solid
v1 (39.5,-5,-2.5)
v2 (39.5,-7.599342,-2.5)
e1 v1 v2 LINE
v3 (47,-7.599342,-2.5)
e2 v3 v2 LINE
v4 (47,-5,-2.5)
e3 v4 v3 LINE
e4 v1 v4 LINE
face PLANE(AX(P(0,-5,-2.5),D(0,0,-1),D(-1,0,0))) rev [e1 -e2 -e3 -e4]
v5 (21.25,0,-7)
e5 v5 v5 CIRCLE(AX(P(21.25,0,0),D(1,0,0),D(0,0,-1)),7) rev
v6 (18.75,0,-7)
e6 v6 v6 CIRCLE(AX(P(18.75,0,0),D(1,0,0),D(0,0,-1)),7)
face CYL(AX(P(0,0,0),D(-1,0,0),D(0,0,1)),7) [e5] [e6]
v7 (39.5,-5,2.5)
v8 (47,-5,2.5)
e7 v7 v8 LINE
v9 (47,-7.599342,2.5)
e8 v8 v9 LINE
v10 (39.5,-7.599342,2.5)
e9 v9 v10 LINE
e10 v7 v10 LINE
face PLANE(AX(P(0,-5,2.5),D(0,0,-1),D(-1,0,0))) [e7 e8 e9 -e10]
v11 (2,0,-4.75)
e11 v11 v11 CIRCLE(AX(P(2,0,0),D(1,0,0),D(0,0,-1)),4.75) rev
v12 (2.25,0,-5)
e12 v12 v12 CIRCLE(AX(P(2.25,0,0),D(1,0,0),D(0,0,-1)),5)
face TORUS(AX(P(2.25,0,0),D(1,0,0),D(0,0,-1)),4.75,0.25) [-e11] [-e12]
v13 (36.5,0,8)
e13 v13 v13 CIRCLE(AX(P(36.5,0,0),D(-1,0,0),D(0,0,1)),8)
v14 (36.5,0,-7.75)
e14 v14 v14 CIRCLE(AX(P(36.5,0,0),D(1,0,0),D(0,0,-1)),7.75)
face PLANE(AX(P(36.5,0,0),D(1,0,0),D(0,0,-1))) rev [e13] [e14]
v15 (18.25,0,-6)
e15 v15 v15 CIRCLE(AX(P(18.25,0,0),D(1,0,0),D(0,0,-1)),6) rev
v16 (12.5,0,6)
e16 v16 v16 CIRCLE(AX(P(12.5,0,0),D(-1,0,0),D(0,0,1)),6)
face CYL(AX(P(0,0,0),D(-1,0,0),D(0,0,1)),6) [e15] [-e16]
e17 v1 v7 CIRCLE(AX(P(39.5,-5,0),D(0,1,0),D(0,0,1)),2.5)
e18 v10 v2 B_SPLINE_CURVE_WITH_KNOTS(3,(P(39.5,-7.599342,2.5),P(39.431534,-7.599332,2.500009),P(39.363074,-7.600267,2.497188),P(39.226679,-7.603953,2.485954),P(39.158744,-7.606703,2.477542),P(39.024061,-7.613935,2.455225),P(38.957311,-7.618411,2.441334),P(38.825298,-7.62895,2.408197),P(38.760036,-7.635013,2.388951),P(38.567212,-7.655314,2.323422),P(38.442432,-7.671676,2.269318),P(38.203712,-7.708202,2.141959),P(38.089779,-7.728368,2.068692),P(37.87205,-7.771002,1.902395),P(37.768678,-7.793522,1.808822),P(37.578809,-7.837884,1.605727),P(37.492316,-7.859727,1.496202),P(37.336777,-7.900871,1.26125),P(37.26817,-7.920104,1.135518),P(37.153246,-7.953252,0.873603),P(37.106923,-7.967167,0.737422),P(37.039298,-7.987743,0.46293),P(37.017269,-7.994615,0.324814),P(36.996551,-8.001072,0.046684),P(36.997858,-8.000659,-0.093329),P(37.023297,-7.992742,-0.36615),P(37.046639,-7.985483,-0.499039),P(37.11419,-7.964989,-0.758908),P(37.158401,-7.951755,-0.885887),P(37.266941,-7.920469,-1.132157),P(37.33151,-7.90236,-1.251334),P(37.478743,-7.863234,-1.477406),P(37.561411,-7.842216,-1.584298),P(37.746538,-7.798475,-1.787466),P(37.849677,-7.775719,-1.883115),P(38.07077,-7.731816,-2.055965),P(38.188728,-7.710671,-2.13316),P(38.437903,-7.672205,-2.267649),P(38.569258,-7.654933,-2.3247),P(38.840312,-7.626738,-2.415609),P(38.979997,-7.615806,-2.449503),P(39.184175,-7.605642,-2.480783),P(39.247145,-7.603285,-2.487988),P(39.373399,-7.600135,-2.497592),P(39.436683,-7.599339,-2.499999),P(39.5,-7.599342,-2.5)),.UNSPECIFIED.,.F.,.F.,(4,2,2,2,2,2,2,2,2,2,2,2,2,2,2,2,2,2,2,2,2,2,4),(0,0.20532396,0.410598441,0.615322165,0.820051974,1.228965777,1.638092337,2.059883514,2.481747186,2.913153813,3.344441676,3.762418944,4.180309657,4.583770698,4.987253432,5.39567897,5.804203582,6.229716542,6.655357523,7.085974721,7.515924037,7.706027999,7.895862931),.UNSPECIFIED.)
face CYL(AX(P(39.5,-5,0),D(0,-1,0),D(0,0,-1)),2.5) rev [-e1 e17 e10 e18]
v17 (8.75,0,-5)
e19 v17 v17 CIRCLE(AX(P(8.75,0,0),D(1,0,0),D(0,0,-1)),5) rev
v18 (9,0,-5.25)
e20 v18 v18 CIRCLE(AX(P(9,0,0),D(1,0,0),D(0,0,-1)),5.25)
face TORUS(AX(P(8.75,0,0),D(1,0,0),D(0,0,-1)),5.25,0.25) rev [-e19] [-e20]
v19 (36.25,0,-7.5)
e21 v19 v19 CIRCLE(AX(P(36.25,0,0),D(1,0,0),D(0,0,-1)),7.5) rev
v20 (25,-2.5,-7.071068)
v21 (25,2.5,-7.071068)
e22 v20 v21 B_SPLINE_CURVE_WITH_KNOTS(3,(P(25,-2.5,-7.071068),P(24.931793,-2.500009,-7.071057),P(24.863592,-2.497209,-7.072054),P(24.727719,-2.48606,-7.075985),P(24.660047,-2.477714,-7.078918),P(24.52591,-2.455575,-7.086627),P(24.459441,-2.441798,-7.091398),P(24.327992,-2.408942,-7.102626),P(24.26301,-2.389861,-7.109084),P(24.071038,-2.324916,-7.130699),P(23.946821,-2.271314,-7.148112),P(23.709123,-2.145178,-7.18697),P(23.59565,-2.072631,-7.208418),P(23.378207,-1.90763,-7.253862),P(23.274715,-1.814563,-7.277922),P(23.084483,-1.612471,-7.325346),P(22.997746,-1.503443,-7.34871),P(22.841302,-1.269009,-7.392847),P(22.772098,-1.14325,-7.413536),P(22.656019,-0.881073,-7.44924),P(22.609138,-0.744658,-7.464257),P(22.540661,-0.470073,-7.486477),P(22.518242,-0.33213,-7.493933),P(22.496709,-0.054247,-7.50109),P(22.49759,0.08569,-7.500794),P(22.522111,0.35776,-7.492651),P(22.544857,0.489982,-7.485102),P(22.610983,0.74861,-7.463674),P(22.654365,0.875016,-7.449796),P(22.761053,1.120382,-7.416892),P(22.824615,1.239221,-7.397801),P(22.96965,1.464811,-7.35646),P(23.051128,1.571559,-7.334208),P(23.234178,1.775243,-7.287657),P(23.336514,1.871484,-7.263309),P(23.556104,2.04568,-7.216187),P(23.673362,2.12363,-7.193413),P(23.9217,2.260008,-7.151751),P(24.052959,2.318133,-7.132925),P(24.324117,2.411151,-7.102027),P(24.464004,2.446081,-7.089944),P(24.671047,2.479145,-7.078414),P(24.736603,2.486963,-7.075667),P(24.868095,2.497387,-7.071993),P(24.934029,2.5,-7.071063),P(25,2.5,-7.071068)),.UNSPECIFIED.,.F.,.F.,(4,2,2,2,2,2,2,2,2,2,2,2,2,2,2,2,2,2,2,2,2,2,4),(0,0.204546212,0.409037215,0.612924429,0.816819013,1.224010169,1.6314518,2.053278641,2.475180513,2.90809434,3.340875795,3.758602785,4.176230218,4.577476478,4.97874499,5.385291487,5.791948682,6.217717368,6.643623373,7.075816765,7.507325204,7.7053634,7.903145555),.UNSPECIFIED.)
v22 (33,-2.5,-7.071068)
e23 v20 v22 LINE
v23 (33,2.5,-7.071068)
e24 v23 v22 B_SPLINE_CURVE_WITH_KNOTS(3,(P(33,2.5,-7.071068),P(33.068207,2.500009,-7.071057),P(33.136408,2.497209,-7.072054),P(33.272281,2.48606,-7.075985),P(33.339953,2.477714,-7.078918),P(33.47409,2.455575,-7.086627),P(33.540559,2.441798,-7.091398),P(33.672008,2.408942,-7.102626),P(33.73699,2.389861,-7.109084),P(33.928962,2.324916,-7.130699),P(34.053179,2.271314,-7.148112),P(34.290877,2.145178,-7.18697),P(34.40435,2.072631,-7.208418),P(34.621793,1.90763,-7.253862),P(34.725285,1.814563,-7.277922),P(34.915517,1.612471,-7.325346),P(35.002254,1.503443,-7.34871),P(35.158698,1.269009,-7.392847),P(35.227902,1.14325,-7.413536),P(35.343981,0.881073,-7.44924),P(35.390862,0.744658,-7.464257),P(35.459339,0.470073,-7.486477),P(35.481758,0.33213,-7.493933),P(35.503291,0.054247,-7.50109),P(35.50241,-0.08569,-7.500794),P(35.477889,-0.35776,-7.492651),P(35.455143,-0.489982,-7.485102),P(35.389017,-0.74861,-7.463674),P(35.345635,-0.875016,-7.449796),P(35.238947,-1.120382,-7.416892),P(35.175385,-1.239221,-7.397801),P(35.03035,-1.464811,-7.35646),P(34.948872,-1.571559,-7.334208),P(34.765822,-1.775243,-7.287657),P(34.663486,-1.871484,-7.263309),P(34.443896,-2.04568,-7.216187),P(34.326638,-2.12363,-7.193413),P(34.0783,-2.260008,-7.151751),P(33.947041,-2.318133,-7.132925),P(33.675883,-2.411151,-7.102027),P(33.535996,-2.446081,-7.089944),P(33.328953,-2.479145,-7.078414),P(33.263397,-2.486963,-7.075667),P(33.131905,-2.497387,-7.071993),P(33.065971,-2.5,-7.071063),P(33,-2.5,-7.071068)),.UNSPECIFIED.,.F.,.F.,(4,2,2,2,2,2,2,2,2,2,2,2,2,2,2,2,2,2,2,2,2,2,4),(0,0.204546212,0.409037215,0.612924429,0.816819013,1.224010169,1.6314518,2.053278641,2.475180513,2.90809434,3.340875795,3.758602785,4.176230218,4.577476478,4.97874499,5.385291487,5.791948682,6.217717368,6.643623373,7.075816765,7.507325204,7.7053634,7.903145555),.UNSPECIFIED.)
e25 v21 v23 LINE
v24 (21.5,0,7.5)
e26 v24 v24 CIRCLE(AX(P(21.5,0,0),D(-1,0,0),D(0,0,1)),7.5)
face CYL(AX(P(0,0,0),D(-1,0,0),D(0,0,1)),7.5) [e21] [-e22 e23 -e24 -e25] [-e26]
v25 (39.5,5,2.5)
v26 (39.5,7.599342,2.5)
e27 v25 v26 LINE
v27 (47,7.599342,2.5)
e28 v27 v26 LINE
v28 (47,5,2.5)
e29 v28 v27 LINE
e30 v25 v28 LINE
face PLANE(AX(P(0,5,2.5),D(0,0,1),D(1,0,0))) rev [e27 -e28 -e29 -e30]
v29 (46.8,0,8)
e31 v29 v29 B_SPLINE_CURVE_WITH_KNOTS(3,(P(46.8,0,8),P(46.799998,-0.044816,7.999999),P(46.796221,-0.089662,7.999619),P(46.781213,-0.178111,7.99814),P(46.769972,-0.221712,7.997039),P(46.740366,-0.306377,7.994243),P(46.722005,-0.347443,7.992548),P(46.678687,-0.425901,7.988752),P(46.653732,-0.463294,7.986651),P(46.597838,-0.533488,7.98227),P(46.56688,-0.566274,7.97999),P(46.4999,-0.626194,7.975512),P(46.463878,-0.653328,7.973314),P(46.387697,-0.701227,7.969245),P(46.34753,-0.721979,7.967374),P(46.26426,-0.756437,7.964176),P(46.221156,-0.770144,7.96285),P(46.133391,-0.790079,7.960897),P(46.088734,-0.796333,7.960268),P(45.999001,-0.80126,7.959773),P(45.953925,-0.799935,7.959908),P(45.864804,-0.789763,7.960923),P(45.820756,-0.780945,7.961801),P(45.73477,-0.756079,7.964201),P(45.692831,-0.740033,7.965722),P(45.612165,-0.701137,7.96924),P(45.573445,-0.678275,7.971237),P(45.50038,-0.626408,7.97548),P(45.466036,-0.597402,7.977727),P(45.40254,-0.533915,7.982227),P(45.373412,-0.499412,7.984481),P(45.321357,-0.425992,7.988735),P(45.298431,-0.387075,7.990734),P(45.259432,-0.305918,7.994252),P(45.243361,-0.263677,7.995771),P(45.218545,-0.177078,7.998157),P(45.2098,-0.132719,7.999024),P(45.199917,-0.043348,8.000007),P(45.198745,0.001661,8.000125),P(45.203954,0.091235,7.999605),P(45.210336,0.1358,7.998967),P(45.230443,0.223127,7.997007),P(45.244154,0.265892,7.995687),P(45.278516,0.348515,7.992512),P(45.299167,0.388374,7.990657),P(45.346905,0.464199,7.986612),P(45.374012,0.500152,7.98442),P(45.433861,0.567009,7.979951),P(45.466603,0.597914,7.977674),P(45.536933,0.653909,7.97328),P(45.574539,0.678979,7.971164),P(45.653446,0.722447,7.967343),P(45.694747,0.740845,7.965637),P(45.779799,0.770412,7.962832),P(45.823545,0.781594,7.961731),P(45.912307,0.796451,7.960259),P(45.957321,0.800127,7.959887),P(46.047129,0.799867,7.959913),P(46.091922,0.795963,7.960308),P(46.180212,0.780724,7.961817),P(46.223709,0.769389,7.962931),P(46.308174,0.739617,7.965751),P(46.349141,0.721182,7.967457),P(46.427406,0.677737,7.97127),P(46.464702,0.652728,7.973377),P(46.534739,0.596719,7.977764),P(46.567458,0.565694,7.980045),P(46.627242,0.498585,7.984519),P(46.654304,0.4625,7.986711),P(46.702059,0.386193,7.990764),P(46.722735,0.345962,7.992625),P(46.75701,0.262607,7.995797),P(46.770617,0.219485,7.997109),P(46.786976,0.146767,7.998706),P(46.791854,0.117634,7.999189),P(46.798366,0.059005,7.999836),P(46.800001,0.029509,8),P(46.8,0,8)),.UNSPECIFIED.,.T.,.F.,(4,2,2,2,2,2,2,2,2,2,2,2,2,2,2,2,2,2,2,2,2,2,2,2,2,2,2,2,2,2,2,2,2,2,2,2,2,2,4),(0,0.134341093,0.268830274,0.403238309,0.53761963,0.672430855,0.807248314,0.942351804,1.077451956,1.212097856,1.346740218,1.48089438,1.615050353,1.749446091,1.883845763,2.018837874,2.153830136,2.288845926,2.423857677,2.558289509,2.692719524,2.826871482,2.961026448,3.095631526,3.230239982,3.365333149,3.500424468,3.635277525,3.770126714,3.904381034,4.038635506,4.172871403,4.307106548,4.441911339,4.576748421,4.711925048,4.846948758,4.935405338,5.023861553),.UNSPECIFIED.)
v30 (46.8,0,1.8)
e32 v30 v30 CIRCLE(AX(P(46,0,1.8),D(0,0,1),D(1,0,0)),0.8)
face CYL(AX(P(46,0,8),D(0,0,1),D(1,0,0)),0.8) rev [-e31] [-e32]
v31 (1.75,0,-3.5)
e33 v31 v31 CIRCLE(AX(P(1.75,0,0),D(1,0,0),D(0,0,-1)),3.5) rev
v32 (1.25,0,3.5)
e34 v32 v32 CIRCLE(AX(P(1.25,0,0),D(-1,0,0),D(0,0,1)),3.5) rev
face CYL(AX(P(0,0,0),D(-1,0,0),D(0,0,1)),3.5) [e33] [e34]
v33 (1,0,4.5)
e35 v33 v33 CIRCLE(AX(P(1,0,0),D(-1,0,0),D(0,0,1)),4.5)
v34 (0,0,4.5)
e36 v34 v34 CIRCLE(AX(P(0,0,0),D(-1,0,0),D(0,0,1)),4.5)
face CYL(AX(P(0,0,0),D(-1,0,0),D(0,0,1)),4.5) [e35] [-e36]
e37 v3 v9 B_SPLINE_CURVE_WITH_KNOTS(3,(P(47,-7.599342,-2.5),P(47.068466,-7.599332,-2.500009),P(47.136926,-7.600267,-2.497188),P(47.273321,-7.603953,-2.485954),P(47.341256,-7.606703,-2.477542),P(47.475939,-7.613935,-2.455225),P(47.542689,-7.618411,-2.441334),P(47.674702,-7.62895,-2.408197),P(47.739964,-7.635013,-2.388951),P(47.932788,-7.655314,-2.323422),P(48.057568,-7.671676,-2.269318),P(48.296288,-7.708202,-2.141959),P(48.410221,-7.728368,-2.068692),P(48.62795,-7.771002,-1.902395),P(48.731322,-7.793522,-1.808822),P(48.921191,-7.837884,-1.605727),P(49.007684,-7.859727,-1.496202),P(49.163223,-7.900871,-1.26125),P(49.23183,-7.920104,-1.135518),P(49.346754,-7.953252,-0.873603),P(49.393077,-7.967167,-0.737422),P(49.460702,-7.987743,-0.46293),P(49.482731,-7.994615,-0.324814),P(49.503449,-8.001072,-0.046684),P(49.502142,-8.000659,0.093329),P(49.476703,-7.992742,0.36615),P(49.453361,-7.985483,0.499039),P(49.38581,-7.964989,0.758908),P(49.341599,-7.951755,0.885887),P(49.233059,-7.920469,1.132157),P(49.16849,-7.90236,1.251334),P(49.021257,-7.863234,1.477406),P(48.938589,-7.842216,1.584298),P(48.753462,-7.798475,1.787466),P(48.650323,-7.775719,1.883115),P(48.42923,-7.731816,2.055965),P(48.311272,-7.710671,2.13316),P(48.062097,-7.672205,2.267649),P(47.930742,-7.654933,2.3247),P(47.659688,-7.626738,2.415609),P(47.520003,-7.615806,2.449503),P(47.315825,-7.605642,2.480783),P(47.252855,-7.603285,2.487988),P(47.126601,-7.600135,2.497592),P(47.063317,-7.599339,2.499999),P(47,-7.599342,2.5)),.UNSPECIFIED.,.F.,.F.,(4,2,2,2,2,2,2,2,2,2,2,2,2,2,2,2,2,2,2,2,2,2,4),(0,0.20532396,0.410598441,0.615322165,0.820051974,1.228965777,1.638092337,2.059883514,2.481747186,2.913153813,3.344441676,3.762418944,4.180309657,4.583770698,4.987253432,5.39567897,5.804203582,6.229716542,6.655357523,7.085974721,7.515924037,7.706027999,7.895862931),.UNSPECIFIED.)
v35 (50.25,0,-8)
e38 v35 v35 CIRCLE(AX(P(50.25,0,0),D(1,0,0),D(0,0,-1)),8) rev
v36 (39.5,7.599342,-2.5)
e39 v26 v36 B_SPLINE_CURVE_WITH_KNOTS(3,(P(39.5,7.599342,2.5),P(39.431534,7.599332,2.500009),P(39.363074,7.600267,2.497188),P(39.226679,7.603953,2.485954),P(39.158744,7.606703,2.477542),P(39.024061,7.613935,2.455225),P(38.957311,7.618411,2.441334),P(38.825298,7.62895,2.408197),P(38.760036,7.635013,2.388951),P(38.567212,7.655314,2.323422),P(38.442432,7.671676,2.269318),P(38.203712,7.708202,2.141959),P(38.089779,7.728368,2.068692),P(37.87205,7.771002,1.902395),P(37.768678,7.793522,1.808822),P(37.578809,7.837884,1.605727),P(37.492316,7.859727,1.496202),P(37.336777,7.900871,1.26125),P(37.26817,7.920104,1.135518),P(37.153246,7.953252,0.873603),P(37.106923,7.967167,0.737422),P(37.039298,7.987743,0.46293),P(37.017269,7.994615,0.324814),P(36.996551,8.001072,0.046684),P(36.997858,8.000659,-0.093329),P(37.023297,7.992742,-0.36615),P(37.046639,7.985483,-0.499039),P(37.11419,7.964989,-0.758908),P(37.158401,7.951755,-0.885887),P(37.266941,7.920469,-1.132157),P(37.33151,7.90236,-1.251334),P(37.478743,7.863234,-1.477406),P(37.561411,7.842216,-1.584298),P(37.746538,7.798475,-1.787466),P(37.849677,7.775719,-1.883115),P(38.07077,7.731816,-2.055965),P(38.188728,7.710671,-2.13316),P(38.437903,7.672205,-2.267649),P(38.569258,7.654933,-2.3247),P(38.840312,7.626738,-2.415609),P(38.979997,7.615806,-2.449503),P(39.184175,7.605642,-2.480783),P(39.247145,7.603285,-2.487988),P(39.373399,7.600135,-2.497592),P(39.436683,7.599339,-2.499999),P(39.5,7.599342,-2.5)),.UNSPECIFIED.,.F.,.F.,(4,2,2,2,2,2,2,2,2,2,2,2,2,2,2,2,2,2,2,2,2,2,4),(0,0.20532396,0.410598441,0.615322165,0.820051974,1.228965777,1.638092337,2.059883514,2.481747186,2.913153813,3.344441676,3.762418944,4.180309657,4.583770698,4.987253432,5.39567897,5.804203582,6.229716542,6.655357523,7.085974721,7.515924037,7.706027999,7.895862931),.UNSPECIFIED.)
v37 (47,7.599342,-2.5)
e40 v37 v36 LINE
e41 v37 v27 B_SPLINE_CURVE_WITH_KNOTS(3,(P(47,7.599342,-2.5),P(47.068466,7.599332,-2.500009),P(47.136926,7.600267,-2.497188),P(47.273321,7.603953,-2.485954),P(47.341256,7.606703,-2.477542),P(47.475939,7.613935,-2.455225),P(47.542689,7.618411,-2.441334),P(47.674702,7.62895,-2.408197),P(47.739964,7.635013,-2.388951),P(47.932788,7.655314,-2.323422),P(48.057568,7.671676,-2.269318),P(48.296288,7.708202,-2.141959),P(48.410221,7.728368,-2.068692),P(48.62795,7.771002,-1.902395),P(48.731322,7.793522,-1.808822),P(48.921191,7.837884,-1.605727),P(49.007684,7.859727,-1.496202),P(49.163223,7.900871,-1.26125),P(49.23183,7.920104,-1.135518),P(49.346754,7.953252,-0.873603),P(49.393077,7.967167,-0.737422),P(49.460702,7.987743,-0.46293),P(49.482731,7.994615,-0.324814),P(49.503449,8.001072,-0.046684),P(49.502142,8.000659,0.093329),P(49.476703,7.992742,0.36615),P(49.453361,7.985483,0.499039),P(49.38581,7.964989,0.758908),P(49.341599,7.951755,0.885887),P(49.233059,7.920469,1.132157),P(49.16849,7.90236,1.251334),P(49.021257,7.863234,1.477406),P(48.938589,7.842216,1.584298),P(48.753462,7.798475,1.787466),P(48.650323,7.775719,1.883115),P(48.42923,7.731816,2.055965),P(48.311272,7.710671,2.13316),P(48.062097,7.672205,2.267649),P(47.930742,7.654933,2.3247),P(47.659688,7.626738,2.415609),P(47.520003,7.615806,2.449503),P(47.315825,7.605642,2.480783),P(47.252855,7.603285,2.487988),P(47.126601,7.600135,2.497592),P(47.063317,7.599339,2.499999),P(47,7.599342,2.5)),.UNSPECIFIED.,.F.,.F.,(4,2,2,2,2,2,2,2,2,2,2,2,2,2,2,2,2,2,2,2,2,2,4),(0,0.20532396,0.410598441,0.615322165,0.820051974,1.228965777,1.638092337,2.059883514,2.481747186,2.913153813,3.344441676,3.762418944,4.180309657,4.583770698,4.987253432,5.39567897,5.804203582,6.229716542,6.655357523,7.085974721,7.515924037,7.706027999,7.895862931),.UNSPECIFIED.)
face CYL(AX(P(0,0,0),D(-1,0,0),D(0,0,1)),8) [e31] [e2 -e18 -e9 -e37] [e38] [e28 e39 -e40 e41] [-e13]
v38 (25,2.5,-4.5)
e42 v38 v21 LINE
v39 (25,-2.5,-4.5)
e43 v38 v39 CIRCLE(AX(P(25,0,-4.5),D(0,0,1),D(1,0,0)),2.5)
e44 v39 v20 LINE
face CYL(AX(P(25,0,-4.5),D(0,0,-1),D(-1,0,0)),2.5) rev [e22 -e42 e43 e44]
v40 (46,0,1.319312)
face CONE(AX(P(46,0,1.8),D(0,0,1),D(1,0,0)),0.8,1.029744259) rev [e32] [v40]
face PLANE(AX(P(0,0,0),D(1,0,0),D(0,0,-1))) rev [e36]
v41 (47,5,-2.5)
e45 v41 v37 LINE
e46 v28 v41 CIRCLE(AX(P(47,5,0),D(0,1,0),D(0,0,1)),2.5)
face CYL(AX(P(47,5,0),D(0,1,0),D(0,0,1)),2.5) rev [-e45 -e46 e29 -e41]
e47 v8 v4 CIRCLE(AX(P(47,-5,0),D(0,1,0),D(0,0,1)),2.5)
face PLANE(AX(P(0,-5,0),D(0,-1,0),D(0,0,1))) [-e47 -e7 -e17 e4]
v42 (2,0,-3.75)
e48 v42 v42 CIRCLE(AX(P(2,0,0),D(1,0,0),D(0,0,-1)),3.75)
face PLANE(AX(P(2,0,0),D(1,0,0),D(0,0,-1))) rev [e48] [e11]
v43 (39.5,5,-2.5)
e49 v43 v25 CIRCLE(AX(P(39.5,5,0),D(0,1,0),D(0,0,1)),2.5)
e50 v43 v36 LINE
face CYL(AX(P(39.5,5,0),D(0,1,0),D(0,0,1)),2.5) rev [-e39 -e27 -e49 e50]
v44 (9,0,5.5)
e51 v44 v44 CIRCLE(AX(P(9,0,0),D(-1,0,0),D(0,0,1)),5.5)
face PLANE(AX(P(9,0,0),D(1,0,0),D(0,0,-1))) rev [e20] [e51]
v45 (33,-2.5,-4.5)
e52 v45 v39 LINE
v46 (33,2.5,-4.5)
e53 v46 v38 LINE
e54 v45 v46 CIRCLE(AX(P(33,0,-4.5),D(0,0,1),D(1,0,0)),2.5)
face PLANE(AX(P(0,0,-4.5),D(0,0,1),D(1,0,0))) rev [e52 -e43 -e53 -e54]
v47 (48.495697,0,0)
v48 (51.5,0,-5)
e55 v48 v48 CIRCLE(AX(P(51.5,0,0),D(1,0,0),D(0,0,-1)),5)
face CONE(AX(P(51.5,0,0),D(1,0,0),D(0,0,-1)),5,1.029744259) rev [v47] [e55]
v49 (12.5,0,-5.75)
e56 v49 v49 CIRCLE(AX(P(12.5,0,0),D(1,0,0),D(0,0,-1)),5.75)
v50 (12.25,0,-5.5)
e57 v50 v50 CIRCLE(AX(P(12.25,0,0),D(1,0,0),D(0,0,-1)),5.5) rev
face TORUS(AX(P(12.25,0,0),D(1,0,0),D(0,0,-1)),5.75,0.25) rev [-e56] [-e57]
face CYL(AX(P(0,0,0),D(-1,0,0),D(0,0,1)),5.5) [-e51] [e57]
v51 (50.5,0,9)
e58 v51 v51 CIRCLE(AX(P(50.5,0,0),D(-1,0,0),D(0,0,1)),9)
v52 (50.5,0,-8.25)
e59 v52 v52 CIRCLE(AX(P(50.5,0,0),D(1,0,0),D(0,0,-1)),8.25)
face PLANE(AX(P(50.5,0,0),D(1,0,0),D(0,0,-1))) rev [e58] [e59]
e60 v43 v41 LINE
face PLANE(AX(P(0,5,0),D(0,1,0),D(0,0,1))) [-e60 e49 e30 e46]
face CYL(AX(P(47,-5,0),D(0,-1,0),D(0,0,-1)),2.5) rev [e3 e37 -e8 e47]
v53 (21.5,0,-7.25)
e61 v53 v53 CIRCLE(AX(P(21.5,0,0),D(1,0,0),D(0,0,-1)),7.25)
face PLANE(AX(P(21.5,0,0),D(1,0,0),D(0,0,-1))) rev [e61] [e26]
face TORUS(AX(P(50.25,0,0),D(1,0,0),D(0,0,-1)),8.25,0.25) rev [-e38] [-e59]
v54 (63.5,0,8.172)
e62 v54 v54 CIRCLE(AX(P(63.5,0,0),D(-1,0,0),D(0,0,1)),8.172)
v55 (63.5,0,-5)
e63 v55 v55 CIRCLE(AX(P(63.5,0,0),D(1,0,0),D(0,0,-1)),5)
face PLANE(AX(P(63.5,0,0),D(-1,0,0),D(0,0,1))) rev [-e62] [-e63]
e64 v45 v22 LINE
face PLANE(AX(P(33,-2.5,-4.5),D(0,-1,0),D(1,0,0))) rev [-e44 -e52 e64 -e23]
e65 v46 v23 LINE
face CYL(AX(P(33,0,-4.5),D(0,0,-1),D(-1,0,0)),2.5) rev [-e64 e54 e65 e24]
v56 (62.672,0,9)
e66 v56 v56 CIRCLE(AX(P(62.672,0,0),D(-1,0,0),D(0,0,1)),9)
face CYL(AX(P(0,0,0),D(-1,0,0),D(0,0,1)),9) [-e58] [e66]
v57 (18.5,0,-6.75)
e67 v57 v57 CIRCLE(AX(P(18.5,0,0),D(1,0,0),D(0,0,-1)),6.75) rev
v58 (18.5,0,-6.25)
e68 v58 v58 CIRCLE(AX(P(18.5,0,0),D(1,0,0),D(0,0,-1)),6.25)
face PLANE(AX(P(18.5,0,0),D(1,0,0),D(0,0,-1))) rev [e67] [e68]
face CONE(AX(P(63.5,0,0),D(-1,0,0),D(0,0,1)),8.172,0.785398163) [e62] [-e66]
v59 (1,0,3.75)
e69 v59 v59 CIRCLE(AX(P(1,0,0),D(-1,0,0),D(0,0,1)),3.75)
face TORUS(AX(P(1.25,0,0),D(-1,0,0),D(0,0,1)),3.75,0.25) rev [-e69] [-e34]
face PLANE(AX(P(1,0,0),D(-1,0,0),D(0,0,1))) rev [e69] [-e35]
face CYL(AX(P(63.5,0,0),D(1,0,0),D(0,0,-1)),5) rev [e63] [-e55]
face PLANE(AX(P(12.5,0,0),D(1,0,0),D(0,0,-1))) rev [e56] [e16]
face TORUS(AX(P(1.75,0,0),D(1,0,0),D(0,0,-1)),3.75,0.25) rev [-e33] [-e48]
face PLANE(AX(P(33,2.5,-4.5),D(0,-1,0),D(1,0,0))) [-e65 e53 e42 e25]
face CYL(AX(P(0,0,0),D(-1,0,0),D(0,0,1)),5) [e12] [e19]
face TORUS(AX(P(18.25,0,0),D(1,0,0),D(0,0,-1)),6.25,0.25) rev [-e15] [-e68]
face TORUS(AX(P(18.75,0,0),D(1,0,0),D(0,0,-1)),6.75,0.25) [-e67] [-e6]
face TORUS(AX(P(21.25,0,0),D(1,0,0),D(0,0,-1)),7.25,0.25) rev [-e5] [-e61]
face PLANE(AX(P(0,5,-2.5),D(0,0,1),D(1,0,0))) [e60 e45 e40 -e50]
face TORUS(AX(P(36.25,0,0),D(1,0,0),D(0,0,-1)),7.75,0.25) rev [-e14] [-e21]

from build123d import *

# Parameters (mm, degrees)
CUT_EXTRUDE1_DEPTH         = 3
SKETCH6_R                  = 2.5
SKETCH6_W                  = 8
SKETCH6_H                  = 5
CUT_EXTRUDE3_DEPTH         = 3
M2X0_4_TAPPED_HOLE1_D      = 1.6
M2X0_4_TAPPED_HOLE1_DEPTH  = 6.2
M2X0_4_TAPPED_HOLE1_TIP    = 0.480688495
F_10_0MM_DOWEL_HOLE1_D     = 10
F_10_0MM_DOWEL_HOLE1_DEPTH = 12
F_10_0MM_DOWEL_HOLE1_TIP   = 3.004303095
FILLET2_R                  = 0.25


# Read off the part's stored shape, not the designer's step: M18x1.5 Machine Threads Stud1
with BuildPart() as part:
    # Sketch1 → Revolve1 (revolve)
    with BuildSketch(Plane.XY, mode=Mode.PRIVATE) as revolve1_sk:
        Polygon((0, 0.614986372), (0, 0), (63.5, 0), (63.5, 11), (53.5, 11), (53.5, 9), (50.5, 9), (50.5, 8), (36.5, 8), (36.5, 7.5), (21.5, 7.5), (21.5, 7), (18.5, 7), (18.5, 6), (12.5, 6), (12.5, 5.5), (9, 5.5), (9, 5), (2, 5), (2, 3.5), (1, 3.5), (1, 4.5), (0, 4.5), align=None)
    revolve(revolve1_sk.sketch.rotate(Axis((0, 0, 0), (1, 0, 0)), 90), axis=Axis((0, 0, 0), (1, 0, 0)))

    # Sketch2 → Cut-Extrude1 (cut)
    with BuildSketch(Plane(origin=(0, 8, 0), x_dir=(1, 0, 0), z_dir=(0, 1, 0))):
        with BuildLine():
            ThreePointArc((39.5, 2.5), (37.732233047, 1.767766953), (37, 0))
            Line((37, 0), (39.5, 0))
            Line((39.5, 0), (39.5, 2.5))
        make_face()
        with BuildLine():
            Line((39.5, 0), (37, 0))
            ThreePointArc((37, 0), (37.732233047, -1.767766953), (39.5, -2.5))
            Line((39.5, -2.5), (39.5, 0))
        make_face()
        with BuildLine():
            Line((39.5, 2.5), (39.5, 0))
            Line((39.5, 0), (42, 0))
            ThreePointArc((42, 0), (41.267766953, 1.767766953), (39.5, 2.5))
        make_face()
        with BuildLine():
            Line((42, 0), (39.5, 0))
            Line((39.5, 0), (39.5, -2.5))
            ThreePointArc((39.5, -2.5), (41.267766953, -1.767766953), (42, 0))
        make_face()
        with BuildLine():
            Line((47, 2.5), (39.5, 2.5))
            ThreePointArc((39.5, 2.5), (41.267766953, 1.767766953), (42, 0))
            Line((42, 0), (44.5, 0))
            ThreePointArc((44.5, 0), (45.232233047, 1.767766953), (47, 2.5))
        make_face()
        with BuildLine():
            ThreePointArc((42, 0), (41.267766953, -1.767766953), (39.5, -2.5))
            Line((39.5, -2.5), (47, -2.5))
            ThreePointArc((47, -2.5), (45.232233047, -1.767766953), (44.5, 0))
            Line((44.5, 0), (42, 0))
        make_face()
        with BuildLine():
            ThreePointArc((49.5, 0), (48.767766953, 1.767766953), (47, 2.5))
            Line((47, 2.5), (47, 0))
            Line((47, 0), (49.5, 0))
        make_face()
        with BuildLine():
            Line((47, 0), (47, 2.5))
            ThreePointArc((47, 2.5), (45.232233047, 1.767766953), (44.5, 0))
            Line((44.5, 0), (47, 0))
        make_face()
        with BuildLine():
            ThreePointArc((44.5, 0), (45.232233047, -1.767766953), (47, -2.5))
            Line((47, -2.5), (47, 0))
            Line((47, 0), (44.5, 0))
        make_face()
        with BuildLine():
            Line((47, 0), (47, -2.5))
            ThreePointArc((47, -2.5), (48.767766953, -1.767766953), (49.5, 0))
            Line((49.5, 0), (47, 0))
        make_face()
    cut_extrude1 = extrude(amount=-CUT_EXTRUDE1_DEPTH, mode=Mode.SUBTRACT)

    # Mirror1: Cut-Extrude1 across plane
    add(cut_extrude1.mirror(Plane.ZX), mode=Mode.SUBTRACT)

    # Sketch6 → Cut-Extrude3 (cut)
    with BuildSketch(Plane.XY.offset(-7.5)):
        with Locations((25, 0)):
            Circle(SKETCH6_R)
        with Locations((33, 0)):
            Circle(SKETCH6_R)
        with Locations((29, 0)):
            Rectangle(SKETCH6_W, SKETCH6_H)
    extrude(amount=CUT_EXTRUDE3_DEPTH, mode=Mode.SUBTRACT)

    # M2x0.4 Tapped Hole1
    with Locations(Plane.XY.offset(8)):
        with Locations((46, 0)):
            Hole(M2X0_4_TAPPED_HOLE1_D / 2, depth=M2X0_4_TAPPED_HOLE1_DEPTH)
            with Locations((0, 0, -(M2X0_4_TAPPED_HOLE1_DEPTH + M2X0_4_TAPPED_HOLE1_TIP / 2))):  # 118° drill point
                Cone(0, M2X0_4_TAPPED_HOLE1_D / 2, M2X0_4_TAPPED_HOLE1_TIP, mode=Mode.SUBTRACT)

    # M18x1.5 Machine Threads Stud1 outline → M18x1.5 Machine Threads Stud1 (revolve, cut)
    with BuildSketch(Plane.YX):
        Polygon((11, 63.5), (8.172, 63.5), (9, 62.672), (9, 53.5), (11, 53.5), align=None)
    revolve(axis=Axis((0, 0, 0), (1, 0, 0)), mode=Mode.SUBTRACT)

    # Ø10.0mm Dowel Hole1
    with Locations(Plane(origin=(63.5, 0, 0), x_dir=(0, 0, -1), z_dir=(1, 0, 0))):
        with Locations((0, 0)):
            Hole(F_10_0MM_DOWEL_HOLE1_D / 2, depth=F_10_0MM_DOWEL_HOLE1_DEPTH)
            with Locations((0, 0, -(F_10_0MM_DOWEL_HOLE1_DEPTH + F_10_0MM_DOWEL_HOLE1_TIP / 2))):  # 118° drill point
                Cone(0, F_10_0MM_DOWEL_HOLE1_D / 2, F_10_0MM_DOWEL_HOLE1_TIP, mode=Mode.SUBTRACT)

    # Fillet2
    fillet2_edges = [part.edges().sort_by_distance(p)[0] for p in [
        (1, 0, -3.5),
        (2, 0, -3.5),
        (2, 0, -5),
        (9, 0, -5),
        (12.5, 0, -5.5),
        (18.5, 0, -6),
        (18.5, 0, -7),
        (21.5, 0, -7),
        (36.5, 0, -7.5),
        (50.5, 0, -8),
    ]]
    fillet(fillet2_edges, radius=FILLET2_R)


solid = part.part
